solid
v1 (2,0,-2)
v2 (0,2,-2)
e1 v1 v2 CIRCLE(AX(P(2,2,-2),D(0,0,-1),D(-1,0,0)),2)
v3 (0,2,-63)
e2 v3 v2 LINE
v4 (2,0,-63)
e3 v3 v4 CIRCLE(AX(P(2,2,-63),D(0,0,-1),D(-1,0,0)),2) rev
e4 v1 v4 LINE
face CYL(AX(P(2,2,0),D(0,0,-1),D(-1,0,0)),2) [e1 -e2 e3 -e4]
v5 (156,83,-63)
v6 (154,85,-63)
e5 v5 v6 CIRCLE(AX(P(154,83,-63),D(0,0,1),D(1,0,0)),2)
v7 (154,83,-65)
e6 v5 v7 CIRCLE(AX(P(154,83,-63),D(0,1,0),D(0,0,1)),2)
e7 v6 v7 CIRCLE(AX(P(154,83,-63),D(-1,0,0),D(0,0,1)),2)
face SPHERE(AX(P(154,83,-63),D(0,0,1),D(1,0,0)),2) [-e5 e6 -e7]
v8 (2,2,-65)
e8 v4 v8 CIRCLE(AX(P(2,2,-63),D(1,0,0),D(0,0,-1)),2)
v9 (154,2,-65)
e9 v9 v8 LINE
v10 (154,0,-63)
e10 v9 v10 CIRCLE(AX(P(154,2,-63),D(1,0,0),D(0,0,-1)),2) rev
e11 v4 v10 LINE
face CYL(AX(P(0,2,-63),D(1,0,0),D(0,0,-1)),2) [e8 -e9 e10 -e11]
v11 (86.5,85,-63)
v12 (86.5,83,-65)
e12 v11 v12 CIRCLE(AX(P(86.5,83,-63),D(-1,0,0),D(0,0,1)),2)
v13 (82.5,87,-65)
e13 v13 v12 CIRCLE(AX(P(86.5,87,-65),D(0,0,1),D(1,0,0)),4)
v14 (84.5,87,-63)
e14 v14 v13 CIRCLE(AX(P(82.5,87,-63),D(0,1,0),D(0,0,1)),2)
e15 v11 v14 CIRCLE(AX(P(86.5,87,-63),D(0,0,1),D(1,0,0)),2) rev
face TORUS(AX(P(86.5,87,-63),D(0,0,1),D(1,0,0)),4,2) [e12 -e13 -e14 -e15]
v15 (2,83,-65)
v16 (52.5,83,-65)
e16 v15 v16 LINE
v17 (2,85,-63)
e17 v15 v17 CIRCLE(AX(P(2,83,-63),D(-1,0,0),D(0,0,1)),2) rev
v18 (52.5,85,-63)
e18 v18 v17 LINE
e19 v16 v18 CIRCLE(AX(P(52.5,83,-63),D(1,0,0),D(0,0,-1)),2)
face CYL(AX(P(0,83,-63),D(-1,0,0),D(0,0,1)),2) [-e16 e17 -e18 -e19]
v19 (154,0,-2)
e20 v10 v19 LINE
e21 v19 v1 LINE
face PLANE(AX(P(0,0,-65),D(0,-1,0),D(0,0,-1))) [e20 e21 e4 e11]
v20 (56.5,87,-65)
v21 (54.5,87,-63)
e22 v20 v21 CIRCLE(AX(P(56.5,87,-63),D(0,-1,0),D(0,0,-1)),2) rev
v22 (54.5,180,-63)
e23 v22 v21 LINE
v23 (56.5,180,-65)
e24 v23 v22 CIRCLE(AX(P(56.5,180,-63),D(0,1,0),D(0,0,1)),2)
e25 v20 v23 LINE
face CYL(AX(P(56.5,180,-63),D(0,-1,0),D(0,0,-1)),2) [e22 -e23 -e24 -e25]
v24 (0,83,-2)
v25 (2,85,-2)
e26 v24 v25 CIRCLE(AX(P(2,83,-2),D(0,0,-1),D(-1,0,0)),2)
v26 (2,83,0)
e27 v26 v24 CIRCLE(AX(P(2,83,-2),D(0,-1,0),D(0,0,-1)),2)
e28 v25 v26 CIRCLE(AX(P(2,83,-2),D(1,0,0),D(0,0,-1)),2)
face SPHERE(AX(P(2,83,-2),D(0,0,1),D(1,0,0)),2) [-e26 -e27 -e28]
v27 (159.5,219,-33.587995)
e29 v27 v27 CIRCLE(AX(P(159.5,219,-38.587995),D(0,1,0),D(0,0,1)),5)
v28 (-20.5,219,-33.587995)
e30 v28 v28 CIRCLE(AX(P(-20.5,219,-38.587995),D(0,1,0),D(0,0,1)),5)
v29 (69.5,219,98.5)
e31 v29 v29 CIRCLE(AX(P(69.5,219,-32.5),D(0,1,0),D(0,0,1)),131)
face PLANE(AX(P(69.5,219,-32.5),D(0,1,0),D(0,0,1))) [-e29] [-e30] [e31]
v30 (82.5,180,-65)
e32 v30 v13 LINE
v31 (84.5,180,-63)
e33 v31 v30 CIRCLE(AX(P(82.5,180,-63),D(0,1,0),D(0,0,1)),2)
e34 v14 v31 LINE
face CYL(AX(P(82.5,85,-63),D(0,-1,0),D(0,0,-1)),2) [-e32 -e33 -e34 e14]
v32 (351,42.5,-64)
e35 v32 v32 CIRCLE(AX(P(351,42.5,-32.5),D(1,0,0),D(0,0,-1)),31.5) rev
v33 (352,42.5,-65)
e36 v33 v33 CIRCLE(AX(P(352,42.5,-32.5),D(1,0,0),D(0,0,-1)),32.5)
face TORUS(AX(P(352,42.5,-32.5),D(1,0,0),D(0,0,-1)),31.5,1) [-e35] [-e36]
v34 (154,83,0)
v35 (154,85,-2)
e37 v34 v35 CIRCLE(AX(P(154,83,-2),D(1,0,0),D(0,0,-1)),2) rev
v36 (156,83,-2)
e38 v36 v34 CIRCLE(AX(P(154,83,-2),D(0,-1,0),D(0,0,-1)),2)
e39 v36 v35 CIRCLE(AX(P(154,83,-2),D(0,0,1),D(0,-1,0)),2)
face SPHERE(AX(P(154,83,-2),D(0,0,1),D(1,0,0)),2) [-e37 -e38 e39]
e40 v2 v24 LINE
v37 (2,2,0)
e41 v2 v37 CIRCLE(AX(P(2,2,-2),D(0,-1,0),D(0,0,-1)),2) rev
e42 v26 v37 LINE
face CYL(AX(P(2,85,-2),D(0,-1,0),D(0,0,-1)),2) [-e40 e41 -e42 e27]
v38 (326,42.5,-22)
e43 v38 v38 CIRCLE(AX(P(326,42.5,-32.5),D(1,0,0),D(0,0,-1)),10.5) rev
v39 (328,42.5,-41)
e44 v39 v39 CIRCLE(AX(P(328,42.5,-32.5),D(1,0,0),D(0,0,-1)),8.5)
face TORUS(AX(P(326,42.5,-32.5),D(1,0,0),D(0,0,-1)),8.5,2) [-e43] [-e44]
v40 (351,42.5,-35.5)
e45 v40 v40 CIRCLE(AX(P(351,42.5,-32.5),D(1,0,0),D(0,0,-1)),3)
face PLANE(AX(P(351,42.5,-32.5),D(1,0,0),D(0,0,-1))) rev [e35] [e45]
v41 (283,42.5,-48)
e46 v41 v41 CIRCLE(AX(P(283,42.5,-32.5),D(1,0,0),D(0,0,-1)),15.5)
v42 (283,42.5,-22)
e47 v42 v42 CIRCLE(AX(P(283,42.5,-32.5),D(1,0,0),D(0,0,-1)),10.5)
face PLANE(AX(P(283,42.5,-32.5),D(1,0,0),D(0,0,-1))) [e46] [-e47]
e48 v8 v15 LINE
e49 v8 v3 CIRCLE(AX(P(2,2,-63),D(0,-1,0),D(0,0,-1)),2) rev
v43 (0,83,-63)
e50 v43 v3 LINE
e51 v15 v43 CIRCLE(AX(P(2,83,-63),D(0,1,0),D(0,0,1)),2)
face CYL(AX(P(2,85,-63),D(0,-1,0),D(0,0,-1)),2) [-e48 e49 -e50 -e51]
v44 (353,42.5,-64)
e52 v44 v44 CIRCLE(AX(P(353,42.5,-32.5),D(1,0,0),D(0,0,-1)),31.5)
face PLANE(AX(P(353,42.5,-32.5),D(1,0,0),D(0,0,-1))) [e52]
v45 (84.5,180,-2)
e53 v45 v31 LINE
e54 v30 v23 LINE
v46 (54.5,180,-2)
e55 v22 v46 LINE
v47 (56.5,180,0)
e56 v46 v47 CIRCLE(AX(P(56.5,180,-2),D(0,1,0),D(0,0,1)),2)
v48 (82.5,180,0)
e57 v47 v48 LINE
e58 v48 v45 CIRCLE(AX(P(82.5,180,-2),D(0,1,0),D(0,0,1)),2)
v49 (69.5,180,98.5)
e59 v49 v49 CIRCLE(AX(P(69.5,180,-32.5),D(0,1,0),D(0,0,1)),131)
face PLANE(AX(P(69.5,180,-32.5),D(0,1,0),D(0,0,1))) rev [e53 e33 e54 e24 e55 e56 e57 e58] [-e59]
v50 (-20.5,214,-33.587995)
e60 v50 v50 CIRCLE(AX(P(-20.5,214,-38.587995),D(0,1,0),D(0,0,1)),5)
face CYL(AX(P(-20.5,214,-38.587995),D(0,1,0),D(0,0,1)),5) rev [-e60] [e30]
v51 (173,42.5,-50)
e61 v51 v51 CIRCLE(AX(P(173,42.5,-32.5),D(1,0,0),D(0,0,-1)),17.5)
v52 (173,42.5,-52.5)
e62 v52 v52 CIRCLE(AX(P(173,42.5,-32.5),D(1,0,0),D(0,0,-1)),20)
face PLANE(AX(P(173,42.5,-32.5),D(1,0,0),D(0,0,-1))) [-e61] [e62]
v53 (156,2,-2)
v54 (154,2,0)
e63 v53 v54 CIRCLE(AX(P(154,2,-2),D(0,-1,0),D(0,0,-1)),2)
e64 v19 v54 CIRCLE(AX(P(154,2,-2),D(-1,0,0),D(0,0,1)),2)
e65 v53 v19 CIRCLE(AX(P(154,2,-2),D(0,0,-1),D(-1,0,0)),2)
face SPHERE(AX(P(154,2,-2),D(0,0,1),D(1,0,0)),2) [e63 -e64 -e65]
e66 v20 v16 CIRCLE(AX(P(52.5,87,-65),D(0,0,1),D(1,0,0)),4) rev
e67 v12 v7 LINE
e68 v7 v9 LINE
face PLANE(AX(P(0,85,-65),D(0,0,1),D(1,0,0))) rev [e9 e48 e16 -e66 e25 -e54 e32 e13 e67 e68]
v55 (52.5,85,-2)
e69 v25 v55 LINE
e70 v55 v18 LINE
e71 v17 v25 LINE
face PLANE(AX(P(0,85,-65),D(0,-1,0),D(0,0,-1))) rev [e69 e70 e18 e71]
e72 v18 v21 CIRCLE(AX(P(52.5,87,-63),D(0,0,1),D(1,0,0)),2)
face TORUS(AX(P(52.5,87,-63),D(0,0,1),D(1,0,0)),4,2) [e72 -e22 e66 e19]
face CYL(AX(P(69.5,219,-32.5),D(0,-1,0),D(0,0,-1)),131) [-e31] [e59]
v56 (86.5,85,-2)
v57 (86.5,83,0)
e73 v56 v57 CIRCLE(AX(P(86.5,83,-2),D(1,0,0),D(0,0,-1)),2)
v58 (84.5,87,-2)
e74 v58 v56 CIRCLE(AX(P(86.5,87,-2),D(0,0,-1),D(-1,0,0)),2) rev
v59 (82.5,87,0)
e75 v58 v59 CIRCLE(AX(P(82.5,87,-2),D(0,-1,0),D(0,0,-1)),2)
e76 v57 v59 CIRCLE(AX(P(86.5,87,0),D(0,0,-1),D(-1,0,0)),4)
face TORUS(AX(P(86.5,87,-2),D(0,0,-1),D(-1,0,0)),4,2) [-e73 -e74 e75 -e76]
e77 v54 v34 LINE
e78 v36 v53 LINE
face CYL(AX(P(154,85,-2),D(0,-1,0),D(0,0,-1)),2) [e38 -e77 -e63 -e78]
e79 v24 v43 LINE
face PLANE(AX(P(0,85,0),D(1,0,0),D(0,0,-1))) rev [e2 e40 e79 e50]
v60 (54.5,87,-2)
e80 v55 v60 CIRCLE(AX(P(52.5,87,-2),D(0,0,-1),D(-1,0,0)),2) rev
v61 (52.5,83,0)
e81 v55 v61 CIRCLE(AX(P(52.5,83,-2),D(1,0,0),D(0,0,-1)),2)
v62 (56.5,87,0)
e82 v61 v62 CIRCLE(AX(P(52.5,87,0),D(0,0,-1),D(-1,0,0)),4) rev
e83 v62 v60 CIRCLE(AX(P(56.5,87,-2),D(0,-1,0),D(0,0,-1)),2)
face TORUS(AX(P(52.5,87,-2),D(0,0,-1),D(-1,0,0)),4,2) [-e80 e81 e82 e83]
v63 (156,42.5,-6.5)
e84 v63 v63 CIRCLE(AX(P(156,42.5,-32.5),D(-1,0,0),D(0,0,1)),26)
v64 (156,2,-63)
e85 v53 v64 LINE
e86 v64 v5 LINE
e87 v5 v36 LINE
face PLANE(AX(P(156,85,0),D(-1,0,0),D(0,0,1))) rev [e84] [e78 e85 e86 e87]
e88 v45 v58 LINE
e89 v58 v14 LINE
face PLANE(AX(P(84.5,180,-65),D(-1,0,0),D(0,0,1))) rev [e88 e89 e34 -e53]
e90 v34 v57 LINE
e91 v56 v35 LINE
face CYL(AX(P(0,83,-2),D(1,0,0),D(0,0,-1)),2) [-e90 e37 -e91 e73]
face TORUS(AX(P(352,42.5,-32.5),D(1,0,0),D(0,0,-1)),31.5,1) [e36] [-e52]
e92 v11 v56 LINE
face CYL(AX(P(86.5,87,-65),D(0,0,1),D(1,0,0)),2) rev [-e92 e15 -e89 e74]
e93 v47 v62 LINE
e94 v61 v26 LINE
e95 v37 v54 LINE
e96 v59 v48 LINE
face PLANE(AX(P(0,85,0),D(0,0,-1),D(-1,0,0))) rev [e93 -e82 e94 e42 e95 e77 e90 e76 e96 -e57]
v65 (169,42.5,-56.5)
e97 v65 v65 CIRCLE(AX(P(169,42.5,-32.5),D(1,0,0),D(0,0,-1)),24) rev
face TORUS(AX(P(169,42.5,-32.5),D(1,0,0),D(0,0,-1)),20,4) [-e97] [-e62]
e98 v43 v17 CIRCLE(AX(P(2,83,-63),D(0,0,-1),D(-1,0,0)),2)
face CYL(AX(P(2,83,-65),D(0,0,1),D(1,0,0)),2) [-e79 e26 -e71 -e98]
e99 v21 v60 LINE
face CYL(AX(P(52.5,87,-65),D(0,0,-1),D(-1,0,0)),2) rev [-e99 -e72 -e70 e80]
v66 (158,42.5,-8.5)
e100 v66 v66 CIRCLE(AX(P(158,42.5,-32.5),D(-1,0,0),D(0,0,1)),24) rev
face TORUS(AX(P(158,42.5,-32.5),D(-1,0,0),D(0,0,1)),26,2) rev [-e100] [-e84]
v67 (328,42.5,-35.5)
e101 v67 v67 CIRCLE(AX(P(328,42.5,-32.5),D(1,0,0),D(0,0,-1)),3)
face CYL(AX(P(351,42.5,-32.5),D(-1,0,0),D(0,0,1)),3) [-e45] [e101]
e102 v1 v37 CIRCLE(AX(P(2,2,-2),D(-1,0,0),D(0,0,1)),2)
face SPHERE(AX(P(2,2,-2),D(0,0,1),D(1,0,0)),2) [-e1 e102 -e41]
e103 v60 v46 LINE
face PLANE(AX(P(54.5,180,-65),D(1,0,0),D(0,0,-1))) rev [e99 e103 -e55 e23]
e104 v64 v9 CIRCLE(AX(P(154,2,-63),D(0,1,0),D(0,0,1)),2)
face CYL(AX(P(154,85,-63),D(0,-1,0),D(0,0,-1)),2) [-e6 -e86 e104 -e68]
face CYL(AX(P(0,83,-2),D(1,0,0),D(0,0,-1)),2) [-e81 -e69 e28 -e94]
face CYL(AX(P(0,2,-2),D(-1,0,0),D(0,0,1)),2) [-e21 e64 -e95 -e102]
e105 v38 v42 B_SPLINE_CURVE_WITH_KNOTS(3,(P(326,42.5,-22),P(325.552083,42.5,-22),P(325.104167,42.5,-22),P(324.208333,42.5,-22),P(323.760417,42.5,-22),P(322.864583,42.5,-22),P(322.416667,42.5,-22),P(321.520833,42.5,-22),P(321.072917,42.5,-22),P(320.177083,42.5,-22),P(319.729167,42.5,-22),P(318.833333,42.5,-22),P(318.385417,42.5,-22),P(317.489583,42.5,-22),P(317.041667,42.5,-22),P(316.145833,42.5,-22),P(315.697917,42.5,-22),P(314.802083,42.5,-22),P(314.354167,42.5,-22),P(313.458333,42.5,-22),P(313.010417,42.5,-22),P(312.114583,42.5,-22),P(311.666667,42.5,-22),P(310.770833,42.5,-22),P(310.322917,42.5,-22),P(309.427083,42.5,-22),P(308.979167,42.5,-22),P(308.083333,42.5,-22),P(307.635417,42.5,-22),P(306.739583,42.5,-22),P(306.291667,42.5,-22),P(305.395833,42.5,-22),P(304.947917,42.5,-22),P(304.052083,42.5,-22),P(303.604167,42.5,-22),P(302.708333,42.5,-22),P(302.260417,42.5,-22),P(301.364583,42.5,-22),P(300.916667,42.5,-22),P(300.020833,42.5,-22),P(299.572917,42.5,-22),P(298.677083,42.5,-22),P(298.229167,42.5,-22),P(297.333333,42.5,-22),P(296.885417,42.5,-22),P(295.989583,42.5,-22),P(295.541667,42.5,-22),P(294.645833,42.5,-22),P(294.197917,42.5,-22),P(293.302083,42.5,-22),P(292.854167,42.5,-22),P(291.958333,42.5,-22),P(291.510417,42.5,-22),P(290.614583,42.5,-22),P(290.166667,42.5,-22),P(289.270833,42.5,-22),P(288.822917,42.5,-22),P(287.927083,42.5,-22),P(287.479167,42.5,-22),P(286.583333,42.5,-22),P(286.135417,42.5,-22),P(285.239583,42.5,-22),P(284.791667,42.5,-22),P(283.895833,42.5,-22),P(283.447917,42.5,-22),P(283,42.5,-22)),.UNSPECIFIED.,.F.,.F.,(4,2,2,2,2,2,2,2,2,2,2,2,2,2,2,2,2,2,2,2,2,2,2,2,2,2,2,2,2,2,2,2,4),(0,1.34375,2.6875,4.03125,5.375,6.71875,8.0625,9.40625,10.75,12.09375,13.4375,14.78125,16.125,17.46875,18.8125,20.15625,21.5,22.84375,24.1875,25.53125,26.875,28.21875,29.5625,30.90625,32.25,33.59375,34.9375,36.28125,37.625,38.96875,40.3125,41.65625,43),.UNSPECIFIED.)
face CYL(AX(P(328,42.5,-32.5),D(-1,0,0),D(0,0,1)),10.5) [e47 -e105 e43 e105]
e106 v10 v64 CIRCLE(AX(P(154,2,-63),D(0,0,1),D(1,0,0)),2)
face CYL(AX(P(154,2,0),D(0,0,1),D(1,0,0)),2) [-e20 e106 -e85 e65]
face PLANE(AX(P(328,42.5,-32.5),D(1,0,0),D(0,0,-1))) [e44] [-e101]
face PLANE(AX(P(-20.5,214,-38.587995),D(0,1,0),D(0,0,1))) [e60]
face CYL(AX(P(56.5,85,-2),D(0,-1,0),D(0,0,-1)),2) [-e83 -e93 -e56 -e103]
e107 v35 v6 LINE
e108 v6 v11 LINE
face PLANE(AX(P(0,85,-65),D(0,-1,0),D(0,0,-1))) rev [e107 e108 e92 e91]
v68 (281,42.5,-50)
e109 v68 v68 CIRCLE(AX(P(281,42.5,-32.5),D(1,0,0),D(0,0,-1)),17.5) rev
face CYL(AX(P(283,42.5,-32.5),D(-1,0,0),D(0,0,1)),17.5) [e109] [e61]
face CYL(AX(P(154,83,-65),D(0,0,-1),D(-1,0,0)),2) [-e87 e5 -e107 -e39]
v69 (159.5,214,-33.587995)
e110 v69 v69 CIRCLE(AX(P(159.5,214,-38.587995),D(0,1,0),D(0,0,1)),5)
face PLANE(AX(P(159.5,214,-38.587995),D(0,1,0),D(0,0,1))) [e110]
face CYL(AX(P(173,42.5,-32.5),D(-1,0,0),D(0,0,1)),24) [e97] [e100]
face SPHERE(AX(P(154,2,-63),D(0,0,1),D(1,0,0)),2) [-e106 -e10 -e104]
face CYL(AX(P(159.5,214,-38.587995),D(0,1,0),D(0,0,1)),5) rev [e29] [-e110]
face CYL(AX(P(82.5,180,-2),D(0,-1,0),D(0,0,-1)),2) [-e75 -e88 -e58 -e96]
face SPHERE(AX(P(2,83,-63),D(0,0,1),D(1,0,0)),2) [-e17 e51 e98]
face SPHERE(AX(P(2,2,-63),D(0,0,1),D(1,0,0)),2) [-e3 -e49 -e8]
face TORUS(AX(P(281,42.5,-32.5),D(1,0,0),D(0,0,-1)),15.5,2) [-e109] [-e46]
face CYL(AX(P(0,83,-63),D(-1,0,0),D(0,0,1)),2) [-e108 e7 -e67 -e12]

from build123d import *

# Parameters (mm, degrees)
SKETCH1_W            = 156
SKETCH1_H            = 65
BOSS_EXTRUDE1_DEPTH  = 85
SKETCH5_W            = 30
SKETCH5_H            = 65
BOSS_EXTRUDE4_DEPTH  = 95
SKETCH6_R            = 131
BOSS_EXTRUDE5_DEPTH  = 39
SKETCH7_R            = 5
CUT_EXTRUDE3_DEPTH   = 5
FILLET10_R           = 2
FILLET11_R           = 2
FILLET12_R           = 2
FILLET16_R           = 2
SKETCH2_R            = 24
BOSS_EXTRUDE6_DEPTH  = 17
SKETCH8_R            = 17.5
BOSS_EXTRUDE7_DEPTH  = 110
SKETCH9_R            = 10.5
BOSS_EXTRUDE8_DEPTH  = 45
SKETCH10_R           = 3
BOSS_EXTRUDE9_DEPTH  = 23
SKETCH11_R           = 32.5
BOSS_EXTRUDE10_DEPTH = 2
FILLET17_R           = 2
FILLET18_R           = 4
FILLET19_R           = 1


# Some blends are built 0.0001 mm under size
with BuildPart() as part:
    # Sketch1 → Boss-Extrude1 (new body)
    with BuildSketch(Plane(origin=(0, 0, 0), x_dir=(1, 0, 0), z_dir=(0, 1, 0))):
        with Locations((78, 32.5)):
            Rectangle(SKETCH1_W, SKETCH1_H)
    extrude(amount=BOSS_EXTRUDE1_DEPTH)

    # Sketch5 → Boss-Extrude4 (add)
    with BuildSketch(Plane(origin=(0, 85, 0), x_dir=(1, 0, 0), z_dir=(0, 1, 0))):
        with Locations((69.5, 32.5)):
            Rectangle(SKETCH5_W, SKETCH5_H)
    extrude(amount=BOSS_EXTRUDE4_DEPTH)

    # Sketch6 → Boss-Extrude5 (add)
    with BuildSketch(Plane(origin=(0, 180, 0), x_dir=(1, 0, 0), z_dir=(0, 1, 0))):
        with Locations(Location((69.5, 32.5, 0), (0, 0, 270))):
            Circle(SKETCH6_R)
    extrude(amount=BOSS_EXTRUDE5_DEPTH)

    # Sketch7 → Cut-Extrude3 (cut)
    with BuildSketch(Plane(origin=(0, 219, 0), x_dir=(-1, 0, 0), z_dir=(0, 1, 0))):
        with Locations(Location((20.5, -38.587995043, 0), (0, 0, 90))):
            Circle(SKETCH7_R)
        with Locations(Location((-159.5, -38.587995043, 0), (0, 0, 90))):
            Circle(SKETCH7_R)
    extrude(amount=-CUT_EXTRUDE3_DEPTH, mode=Mode.SUBTRACT)

    # Fillet10
    fillet10_edges = [part.edges().sort_by_distance(p)[0] for p in [
        (0, 42.5, 0),
    ]]
    fillet(fillet10_edges, radius=FILLET10_R)

    # Fillet11
    fillet11_edges = [part.edges().sort_by_distance(p)[0] for p in [
        (54.5, 132.5, -65),
        (54.5, 132.5, 0),
        (79, 0, 0),
        (54.5, 85, -32.5),
        (84.5, 85, -32.5),
        (0, 0, -33.5),
        (0, 85, -33.5),
        (28.25, 85, 0),
        (27.25, 85, -65),
        (0, 42.5, -65),
        (0.585786438, 0, -0.585786438),
        (0.585786438, 85, -0.585786438),
    ]]
    fillet(fillet11_edges, radius=FILLET11_R)

    # Fillet12
    # the kernel refuses this fillet: 2 mm, written as the material it takes off along each edge
    with BuildSketch(Plane(origin=(2, 2, -63), x_dir=(0, 0, -1), z_dir=(0, -1, 0))) as fillet12_piece_1_section:
        Polygon((0, 0), (FILLET12_R, 0), (FILLET12_R, -FILLET12_R), (0, -FILLET12_R), align=None)
    fillet12_piece_1 = extrude(amount=FILLET12_R, mode=Mode.PRIVATE)
    fillet12_piece_1 = fillet12_piece_1 - Plane(origin=(2, 2, -63), x_dir=(0.7071067811865475, 0, 0.7071067811865475), z_dir=(0, -1, 0)) * Sphere(FILLET12_R, mode=Mode.PRIVATE)
    add(fillet12_piece_1, mode=Mode.SUBTRACT)
    with BuildSketch(Plane(origin=(161, 85, -65), x_dir=(0, 0, 1), z_dir=(-1, 0, 0))) as fillet12_piece_2:
        with BuildLine():
            CenterArc((FILLET12_R, -FILLET12_R), FILLET12_R, 90, 90)
            Line((0, -FILLET12_R), (0, 0))
            Line((0, 0), (FILLET12_R, 0))
        make_face()
    extrude(amount=74.5, mode=Mode.SUBTRACT)
    with BuildSketch(Plane(origin=(84.5, 87, 0), x_dir=(-1, 0, 0), z_dir=(0, 1, 0)), Plane(origin=(84.5, 87, -65), x_dir=(0, 0, 1), z_dir=(0, 1, 0))) as fillet12_piece_3:
        with BuildLine():
            CenterArc((FILLET12_R, -FILLET12_R), FILLET12_R, 90, 90)
            Line((0, -FILLET12_R), (0, 0))
            Line((0, 0), (FILLET12_R, 0))
        make_face()
    extrude(amount=93, mode=Mode.SUBTRACT)
    with BuildSketch(Plane(origin=(161, 0, -65), x_dir=(0, 0, 1), z_dir=(-1, 0, 0))) as fillet12_piece_4:
        with BuildLine():
            CenterArc((FILLET12_R, FILLET12_R), FILLET12_R, 180, 90)
            Line((0, FILLET12_R), (0, 0))
            Line((0, 0), (FILLET12_R, 0))
        make_face()
    extrude(amount=159, mode=Mode.SUBTRACT)
    with BuildSketch(Plane(origin=(86.5, 85, 0), x_dir=(0, -1, 0), z_dir=(1, 0, 0))) as fillet12_piece_5:
        with BuildLine():
            CenterArc((FILLET12_R, FILLET12_R), FILLET12_R, 180, 90)
            Line((0, FILLET12_R), (0, 0))
            Line((0, 0), (FILLET12_R, 0))
        make_face()
    extrude(amount=74.5, mode=Mode.SUBTRACT)
    with BuildSketch(Plane(origin=(156, 0, -2), x_dir=(0, 1, 0), z_dir=(0, 0, -1))) as fillet12_piece_6:
        with BuildLine():
            CenterArc((FILLET12_R, -FILLET12_R), FILLET12_R, 90, 90)
            Line((0, -FILLET12_R), (0, 0))
            Line((0, 0), (FILLET12_R, 0))
        make_face()
    extrude(amount=68, mode=Mode.SUBTRACT)
    with BuildSketch(Plane(origin=(156, 2, -2), x_dir=(0, 0, 1), z_dir=(0, 1, 0))) as fillet12_piece_7:
        with BuildLine():
            CenterArc((2 - FILLET12_R, -FILLET12_R), FILLET12_R, 0, 90)
            Line((2 - FILLET12_R, 0), (2, 0))
            Line((2, 0), (2, -FILLET12_R))
        make_face()
    revolve(axis=Axis((156, 2, -2), (1, 0, 0)), revolution_arc=90, mode=Mode.SUBTRACT)
    with BuildSketch(Plane(origin=(86.5, 87, -65), x_dir=(-1, 0, 0), z_dir=(0, 1, 0))) as fillet12_piece_8:
        with BuildLine():
            CenterArc((2 + FILLET12_R, FILLET12_R), FILLET12_R, 180, 90)
            Line((2 + FILLET12_R, 0), (2, 0))
            Line((2, 0), (2, FILLET12_R))
        make_face()
    revolve(axis=Axis((86.5, 87, -65), (0, 0, 1)), revolution_arc=90, mode=Mode.SUBTRACT)
    with BuildSketch(Plane(origin=(86.5, 87, 0), x_dir=(-1, 0, 0), z_dir=(0, 1, 0))) as fillet12_piece_9:
        with BuildLine():
            CenterArc((2 + FILLET12_R, -FILLET12_R), FILLET12_R, 90, 90)
            Line((2, -FILLET12_R), (2, 0))
            Line((2, 0), (2 + FILLET12_R, 0))
        make_face()
    revolve(axis=Axis((86.5, 87, 0), (0, 0, 1)), revolution_arc=90, mode=Mode.SUBTRACT)
    with BuildSketch(Plane(origin=(156, 2, 0), x_dir=(-1, 0, 0), z_dir=(0, 1, 0))) as fillet12_piece_10:
        with BuildLine():
            CenterArc((FILLET12_R, -FILLET12_R), FILLET12_R, 90, 90)
            Line((0, -FILLET12_R), (0, 0))
            Line((0, 0), (FILLET12_R, 0))
        make_face()
    extrude(amount=88, mode=Mode.SUBTRACT)

    # Fillet16
    # the kernel refuses this fillet: 2 mm, written as the material it takes off along each edge
    with BuildSketch(Plane(origin=(154, 83, -2), x_dir=(0, 1, 0), z_dir=(1, 0, 0))) as fillet16_piece_1_section:
        Polygon((0, 0), (FILLET16_R, 0), (FILLET16_R, FILLET16_R), (0, FILLET16_R), align=None)
    fillet16_piece_1 = extrude(amount=FILLET16_R, mode=Mode.PRIVATE)
    fillet16_piece_1 = fillet16_piece_1 - Plane(origin=(154, 83, -2), x_dir=(0, -0.7071067811865475, -0.7071067811865475), z_dir=(1, 0, 0)) * Sphere(FILLET16_R, mode=Mode.PRIVATE)
    add(fillet16_piece_1, mode=Mode.SUBTRACT)
    with BuildSketch(Plane(origin=(154, 2, -63), x_dir=(0, 0, -1), z_dir=(1, 0, 0))) as fillet16_piece_2_section:
        Polygon((0, 0), (FILLET16_R, 0), (FILLET16_R, -FILLET16_R), (0, -FILLET16_R), align=None)
    fillet16_piece_2 = extrude(amount=FILLET16_R, mode=Mode.PRIVATE)
    fillet16_piece_2 = fillet16_piece_2 - Plane(origin=(154, 2, -63), x_dir=(0, 0.7071067811865475, 0.7071067811865475), z_dir=(1, 0, 0)) * Sphere(FILLET16_R, mode=Mode.PRIVATE)
    add(fillet16_piece_2, mode=Mode.SUBTRACT)
    with BuildSketch(Plane(origin=(156, 85, -2), x_dir=(0, -1, 0), z_dir=(0, 0, -1))) as fillet16_piece_3:
        with BuildLine():
            CenterArc((FILLET16_R, FILLET16_R), FILLET16_R, 180, 90)
            Line((0, FILLET16_R), (0, 0))
            Line((0, 0), (FILLET16_R, 0))
        make_face()
    extrude(amount=61, mode=Mode.SUBTRACT)
    with BuildSketch(Plane(origin=(156, 83, -63), x_dir=(0, 0, -1), z_dir=(0, -1, 0))) as fillet16_piece_4:
        with BuildLine():
            CenterArc((2 - FILLET16_R, -FILLET16_R), FILLET16_R, 0, 90)
            Line((2, -FILLET16_R), (2, 0))
            Line((2, 0), (2 - FILLET16_R, 0))
        make_face()
    revolve(axis=Axis((156, 83, -63), (1, 0, 0)), revolution_arc=90, mode=Mode.SUBTRACT)
    with BuildSketch(Plane(origin=(156, 2, -65), x_dir=(0, 0, 1), z_dir=(0, 1, 0))) as fillet16_piece_5:
        with BuildLine():
            CenterArc((FILLET16_R, -FILLET16_R), FILLET16_R, 90, 90)
            Line((0, -FILLET16_R), (0, 0))
            Line((0, 0), (FILLET16_R, 0))
        make_face()
    extrude(amount=81, mode=Mode.SUBTRACT)

    # Sketch2 → Boss-Extrude6 (add)
    with BuildSketch(Plane(origin=(156, 0, 0), x_dir=(0, 0, -1), z_dir=(1, 0, 0))):
        with Locations(Location((32.5, 42.5, 0), (0, 0, 180))):
            Circle(SKETCH2_R)
    extrude(amount=BOSS_EXTRUDE6_DEPTH)

    # Sketch8 → Boss-Extrude7 (add)
    with BuildSketch(Plane(origin=(173, 0, 0), x_dir=(0, 0, -1), z_dir=(1, 0, 0))):
        with Locations((32.5, 42.5)):
            Circle(SKETCH8_R)
    extrude(amount=BOSS_EXTRUDE7_DEPTH)

    # Sketch9 → Boss-Extrude8 (add)
    with BuildSketch(Plane(origin=(283, 0, 0), x_dir=(0, 0, -1), z_dir=(1, 0, 0))):
        with Locations(Location((32.5, 42.5, 0), (0, 0, 180))):
            Circle(SKETCH9_R)
    extrude(amount=BOSS_EXTRUDE8_DEPTH)

    # Sketch10 → Boss-Extrude9 (add)
    with BuildSketch(Plane(origin=(328, 0, 0), x_dir=(0, 0, -1), z_dir=(1, 0, 0))):
        with Locations((32.5, 42.5)):
            Circle(SKETCH10_R)
    extrude(amount=BOSS_EXTRUDE9_DEPTH)

    # Sketch11 → Boss-Extrude10 (add)
    with BuildSketch(Plane(origin=(351, 0, 0), x_dir=(0, 0, -1), z_dir=(1, 0, 0))):
        with Locations((32.5, 42.5)):
            Circle(SKETCH11_R)
    extrude(amount=BOSS_EXTRUDE10_DEPTH)

    # Fillet17
    fillet17_edges = [part.edges().sort_by_distance(p)[0] for p in [
        (156, 42.5, -56.5),
        (283, 42.5, -15),
        (328, 42.5, -43),
    ]]
    fillet(fillet17_edges, radius=FILLET17_R)

    # Fillet18
    fillet18_edges = [part.edges().sort_by_distance(p)[0] for p in [
        (173, 42.5, -56.5),
    ]]
    fillet(fillet18_edges, radius=FILLET18_R)

    # Fillet19
    fillet19_edges = [part.edges().sort_by_distance(p)[0] for p in [
        (351, 42.5, 0),
        (353, 42.5, 0),
    ]]
    fillet(fillet19_edges, radius=FILLET19_R - 0.0001)  # a hair under: the kernel refuses the full size


solid = part.part
